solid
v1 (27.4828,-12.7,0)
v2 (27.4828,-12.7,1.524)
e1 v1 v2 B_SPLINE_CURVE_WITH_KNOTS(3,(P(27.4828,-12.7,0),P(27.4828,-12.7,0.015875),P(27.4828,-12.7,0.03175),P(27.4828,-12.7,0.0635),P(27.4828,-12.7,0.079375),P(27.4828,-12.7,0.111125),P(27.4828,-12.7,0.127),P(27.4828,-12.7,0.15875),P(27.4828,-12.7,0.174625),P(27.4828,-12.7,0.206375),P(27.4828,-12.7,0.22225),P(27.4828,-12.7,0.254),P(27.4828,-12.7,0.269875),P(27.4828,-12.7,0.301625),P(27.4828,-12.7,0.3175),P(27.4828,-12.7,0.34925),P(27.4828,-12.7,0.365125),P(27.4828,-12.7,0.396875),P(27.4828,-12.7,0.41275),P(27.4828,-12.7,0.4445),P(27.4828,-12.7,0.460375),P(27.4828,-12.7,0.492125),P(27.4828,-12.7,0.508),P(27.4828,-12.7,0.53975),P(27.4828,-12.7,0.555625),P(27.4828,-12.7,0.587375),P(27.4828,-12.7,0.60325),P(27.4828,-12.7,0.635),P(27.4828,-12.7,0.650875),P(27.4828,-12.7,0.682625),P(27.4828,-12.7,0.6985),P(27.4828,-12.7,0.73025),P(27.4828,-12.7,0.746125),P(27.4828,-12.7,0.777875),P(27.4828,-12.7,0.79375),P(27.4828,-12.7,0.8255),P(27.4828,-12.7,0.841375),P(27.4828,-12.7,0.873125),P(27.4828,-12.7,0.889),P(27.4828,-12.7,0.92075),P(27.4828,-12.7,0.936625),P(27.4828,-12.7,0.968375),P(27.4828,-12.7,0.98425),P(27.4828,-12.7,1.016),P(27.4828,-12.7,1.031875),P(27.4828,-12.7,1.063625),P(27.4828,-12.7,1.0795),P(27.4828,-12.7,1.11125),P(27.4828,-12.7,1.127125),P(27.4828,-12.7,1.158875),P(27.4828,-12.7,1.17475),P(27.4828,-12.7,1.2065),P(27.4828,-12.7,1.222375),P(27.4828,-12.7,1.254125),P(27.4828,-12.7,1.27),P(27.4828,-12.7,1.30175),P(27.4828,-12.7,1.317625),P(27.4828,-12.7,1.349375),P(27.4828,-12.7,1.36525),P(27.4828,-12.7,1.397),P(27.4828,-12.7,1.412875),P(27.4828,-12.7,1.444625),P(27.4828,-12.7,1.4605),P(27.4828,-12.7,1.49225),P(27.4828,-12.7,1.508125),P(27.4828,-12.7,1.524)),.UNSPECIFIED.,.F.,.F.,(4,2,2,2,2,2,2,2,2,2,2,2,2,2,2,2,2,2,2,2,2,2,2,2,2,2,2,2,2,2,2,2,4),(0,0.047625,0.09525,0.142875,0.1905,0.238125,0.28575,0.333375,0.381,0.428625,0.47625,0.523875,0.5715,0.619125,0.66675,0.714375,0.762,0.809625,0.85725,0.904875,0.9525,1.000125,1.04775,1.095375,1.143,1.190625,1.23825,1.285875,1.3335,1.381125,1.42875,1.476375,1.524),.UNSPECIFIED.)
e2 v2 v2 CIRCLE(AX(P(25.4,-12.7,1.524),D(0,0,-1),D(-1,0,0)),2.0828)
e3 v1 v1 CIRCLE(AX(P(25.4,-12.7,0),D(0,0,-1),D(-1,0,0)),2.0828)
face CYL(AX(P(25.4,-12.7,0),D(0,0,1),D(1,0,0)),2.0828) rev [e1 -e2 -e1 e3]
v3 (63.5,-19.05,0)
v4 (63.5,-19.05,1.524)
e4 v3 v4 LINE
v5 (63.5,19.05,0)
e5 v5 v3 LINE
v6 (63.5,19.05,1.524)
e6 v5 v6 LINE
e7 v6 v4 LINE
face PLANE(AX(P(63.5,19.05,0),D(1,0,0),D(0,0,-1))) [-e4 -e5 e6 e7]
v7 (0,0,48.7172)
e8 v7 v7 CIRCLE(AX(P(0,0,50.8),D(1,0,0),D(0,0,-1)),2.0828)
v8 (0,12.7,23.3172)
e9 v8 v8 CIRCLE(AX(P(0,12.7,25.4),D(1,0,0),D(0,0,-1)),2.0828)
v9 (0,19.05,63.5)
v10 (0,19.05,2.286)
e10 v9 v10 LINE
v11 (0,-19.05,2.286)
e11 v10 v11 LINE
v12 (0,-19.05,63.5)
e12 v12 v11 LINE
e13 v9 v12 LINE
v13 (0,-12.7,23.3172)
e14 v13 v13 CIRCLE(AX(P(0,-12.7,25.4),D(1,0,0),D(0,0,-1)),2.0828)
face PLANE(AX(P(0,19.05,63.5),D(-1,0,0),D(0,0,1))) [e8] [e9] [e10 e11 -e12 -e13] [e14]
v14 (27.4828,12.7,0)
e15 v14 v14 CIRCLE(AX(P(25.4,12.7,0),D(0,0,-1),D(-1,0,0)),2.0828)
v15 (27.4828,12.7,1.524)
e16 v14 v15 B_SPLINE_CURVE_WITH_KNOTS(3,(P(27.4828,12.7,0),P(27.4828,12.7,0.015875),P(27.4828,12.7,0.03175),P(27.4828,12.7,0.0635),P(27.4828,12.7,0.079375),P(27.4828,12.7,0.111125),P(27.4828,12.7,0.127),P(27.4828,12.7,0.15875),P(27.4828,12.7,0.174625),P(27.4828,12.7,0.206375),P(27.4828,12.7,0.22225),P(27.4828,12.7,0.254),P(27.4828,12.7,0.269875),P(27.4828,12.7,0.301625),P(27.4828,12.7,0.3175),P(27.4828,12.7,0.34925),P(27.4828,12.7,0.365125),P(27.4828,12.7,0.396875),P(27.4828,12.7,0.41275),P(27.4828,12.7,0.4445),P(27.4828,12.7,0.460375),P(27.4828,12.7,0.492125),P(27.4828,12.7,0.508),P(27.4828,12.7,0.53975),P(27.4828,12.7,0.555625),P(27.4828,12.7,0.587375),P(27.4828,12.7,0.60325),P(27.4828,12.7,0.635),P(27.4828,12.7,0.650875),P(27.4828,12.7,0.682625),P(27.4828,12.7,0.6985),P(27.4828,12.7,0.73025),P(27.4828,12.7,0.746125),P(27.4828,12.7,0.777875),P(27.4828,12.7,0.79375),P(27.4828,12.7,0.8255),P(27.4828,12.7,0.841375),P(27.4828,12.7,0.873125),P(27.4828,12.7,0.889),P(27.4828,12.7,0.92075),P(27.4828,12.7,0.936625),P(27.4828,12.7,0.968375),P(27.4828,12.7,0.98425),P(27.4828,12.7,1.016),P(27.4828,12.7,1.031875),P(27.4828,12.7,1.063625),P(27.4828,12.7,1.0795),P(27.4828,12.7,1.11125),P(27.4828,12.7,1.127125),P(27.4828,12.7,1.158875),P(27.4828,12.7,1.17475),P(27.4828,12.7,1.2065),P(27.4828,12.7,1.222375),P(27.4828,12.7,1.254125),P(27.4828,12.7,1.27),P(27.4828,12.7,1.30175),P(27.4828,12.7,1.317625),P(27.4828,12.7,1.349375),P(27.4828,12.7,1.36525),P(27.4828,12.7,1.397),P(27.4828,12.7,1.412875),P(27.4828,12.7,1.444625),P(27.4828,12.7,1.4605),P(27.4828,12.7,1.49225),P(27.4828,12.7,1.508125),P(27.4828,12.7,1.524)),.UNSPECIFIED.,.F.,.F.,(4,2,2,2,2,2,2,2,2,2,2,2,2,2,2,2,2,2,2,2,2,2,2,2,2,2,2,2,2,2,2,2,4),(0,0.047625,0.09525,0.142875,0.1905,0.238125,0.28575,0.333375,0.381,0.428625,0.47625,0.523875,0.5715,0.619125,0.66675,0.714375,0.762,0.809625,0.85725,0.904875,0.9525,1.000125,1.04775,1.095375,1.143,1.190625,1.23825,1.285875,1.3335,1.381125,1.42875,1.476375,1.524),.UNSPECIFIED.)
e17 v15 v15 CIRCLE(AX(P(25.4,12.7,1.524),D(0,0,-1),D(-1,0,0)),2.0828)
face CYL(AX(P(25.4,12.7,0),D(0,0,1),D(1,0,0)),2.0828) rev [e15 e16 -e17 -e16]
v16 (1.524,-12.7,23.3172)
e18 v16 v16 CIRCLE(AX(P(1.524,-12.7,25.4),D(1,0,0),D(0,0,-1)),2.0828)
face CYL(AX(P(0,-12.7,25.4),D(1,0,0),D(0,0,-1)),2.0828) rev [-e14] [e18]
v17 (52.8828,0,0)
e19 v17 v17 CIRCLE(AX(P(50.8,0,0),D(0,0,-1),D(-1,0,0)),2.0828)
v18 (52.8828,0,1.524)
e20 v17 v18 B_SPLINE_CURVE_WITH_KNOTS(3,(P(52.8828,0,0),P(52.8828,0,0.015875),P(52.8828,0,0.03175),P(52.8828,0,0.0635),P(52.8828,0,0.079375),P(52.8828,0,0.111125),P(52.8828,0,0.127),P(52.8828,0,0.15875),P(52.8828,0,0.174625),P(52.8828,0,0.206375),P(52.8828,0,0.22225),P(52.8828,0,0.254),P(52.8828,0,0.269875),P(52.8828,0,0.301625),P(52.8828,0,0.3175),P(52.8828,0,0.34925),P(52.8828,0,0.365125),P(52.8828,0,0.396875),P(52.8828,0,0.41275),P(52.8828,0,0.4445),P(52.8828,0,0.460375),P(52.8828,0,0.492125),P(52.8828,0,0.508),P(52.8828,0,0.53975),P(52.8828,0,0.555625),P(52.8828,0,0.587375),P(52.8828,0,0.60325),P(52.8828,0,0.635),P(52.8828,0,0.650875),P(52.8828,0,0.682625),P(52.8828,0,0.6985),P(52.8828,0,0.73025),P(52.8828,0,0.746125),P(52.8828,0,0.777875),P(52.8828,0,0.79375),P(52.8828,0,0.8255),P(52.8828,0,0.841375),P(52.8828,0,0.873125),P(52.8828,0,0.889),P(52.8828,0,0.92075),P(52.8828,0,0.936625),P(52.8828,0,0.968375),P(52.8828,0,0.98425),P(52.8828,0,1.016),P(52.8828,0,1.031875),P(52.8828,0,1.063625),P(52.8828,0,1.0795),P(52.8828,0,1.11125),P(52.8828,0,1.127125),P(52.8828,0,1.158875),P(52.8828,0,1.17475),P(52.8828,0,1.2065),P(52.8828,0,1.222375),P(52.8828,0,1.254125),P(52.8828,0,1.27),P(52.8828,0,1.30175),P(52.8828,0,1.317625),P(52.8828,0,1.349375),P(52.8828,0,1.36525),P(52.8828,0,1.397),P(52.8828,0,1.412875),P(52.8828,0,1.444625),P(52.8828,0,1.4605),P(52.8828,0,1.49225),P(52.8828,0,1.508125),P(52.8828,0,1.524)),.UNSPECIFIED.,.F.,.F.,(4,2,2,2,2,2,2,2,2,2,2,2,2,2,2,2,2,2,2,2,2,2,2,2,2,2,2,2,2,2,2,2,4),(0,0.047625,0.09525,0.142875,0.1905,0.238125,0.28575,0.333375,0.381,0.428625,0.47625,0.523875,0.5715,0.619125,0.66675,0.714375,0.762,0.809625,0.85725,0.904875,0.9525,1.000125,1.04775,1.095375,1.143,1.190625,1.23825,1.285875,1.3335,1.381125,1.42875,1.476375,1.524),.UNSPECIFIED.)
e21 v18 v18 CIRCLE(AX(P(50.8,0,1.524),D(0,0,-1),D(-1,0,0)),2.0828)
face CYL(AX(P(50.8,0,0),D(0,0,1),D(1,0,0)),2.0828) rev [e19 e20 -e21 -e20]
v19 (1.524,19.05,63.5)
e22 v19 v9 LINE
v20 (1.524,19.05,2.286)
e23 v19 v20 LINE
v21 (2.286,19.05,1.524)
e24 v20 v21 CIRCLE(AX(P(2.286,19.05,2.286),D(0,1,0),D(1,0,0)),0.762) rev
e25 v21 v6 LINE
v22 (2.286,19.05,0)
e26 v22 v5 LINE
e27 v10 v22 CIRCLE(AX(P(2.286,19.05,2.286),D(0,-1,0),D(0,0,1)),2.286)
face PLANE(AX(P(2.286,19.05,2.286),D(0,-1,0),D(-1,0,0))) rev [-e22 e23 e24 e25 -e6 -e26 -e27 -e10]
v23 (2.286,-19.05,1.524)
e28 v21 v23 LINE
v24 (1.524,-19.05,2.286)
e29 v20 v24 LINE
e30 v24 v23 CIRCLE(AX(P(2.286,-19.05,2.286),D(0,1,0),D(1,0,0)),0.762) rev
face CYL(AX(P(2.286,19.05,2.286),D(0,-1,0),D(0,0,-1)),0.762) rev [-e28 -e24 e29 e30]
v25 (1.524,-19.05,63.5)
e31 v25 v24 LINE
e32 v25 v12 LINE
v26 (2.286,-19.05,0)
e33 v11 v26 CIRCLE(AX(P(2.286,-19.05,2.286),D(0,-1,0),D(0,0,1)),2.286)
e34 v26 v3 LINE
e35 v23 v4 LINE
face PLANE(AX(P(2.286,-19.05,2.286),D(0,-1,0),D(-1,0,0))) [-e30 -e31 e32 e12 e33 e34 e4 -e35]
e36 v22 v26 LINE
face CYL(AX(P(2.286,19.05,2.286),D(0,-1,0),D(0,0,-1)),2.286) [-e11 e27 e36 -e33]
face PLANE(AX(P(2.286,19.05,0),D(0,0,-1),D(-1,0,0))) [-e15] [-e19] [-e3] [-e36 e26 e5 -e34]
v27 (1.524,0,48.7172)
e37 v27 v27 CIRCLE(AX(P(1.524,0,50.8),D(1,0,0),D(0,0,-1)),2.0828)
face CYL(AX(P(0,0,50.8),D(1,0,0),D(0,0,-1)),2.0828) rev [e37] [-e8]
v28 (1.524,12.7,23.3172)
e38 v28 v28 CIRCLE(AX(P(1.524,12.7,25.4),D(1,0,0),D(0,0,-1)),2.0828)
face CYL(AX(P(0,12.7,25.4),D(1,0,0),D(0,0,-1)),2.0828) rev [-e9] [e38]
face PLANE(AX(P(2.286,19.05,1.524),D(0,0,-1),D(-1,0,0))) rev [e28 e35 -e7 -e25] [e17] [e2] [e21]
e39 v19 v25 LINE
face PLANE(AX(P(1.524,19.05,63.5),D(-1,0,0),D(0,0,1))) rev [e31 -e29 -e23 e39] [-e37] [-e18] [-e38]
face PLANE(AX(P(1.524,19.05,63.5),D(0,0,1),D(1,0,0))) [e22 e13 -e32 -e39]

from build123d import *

# Parameters (mm, degrees)
EXTRUDE_THIN1_START = -19.05
EXTRUDE_THIN1_DEPTH = 38.1
SKETCH4_R           = 2.0828
EXTRUDE3_DEPTH      = 91.75338603


# Read off the part's stored shape, not the designer's step: Extrude-Thin1
with BuildPart() as part:
    # Extrude-Thin1 outline → Extrude-Thin1 (new body)
    with BuildSketch(Plane(origin=(0, 0, 0), x_dir=(1, 0, 0), z_dir=(0, 1, 0)).offset(EXTRUDE_THIN1_START)):
        with BuildLine():
            Line((2.286, -1.524), (63.5, -1.524))
            Line((63.5, -1.524), (63.5, 0))
            Line((63.5, 0), (2.286, 0))
            ThreePointArc((2.286, 0), (0.669553898, -0.669553898), (0, -2.286))
            Line((0, -2.286), (0, -63.5))
            Line((0, -63.5), (1.524, -63.5))
            Line((1.524, -63.5), (1.524, -2.286))
            ThreePointArc((1.524, -2.286), (1.747184633, -1.747184633), (2.286, -1.524))
        make_face()
    extrude(amount=EXTRUDE_THIN1_DEPTH)

    # Sketch4 → Extrude3 (cut, through all)
    with BuildSketch(Plane(origin=(1.524, 0, 0), x_dir=(0, 0, -1), z_dir=(1, 0, 0))):
        with Locations((-50.8, 0)):
            Circle(SKETCH4_R)
        with Locations((-25.4, 12.7)):
            Circle(SKETCH4_R)
        with Locations((-25.4, -12.7)):
            Circle(SKETCH4_R)
    extrude3 = extrude(amount=-EXTRUDE3_DEPTH, mode=Mode.SUBTRACT)

    # Mirror1: Extrude3 across plane
    add(extrude3.mirror(Plane(origin=(0, 0, 0), x_dir=(0.7071067811865465, 0, 0.7071067811865486), z_dir=(-0.7071067811865488, 0, 0.7071067811865464))), mode=Mode.SUBTRACT)


solid = part.part
